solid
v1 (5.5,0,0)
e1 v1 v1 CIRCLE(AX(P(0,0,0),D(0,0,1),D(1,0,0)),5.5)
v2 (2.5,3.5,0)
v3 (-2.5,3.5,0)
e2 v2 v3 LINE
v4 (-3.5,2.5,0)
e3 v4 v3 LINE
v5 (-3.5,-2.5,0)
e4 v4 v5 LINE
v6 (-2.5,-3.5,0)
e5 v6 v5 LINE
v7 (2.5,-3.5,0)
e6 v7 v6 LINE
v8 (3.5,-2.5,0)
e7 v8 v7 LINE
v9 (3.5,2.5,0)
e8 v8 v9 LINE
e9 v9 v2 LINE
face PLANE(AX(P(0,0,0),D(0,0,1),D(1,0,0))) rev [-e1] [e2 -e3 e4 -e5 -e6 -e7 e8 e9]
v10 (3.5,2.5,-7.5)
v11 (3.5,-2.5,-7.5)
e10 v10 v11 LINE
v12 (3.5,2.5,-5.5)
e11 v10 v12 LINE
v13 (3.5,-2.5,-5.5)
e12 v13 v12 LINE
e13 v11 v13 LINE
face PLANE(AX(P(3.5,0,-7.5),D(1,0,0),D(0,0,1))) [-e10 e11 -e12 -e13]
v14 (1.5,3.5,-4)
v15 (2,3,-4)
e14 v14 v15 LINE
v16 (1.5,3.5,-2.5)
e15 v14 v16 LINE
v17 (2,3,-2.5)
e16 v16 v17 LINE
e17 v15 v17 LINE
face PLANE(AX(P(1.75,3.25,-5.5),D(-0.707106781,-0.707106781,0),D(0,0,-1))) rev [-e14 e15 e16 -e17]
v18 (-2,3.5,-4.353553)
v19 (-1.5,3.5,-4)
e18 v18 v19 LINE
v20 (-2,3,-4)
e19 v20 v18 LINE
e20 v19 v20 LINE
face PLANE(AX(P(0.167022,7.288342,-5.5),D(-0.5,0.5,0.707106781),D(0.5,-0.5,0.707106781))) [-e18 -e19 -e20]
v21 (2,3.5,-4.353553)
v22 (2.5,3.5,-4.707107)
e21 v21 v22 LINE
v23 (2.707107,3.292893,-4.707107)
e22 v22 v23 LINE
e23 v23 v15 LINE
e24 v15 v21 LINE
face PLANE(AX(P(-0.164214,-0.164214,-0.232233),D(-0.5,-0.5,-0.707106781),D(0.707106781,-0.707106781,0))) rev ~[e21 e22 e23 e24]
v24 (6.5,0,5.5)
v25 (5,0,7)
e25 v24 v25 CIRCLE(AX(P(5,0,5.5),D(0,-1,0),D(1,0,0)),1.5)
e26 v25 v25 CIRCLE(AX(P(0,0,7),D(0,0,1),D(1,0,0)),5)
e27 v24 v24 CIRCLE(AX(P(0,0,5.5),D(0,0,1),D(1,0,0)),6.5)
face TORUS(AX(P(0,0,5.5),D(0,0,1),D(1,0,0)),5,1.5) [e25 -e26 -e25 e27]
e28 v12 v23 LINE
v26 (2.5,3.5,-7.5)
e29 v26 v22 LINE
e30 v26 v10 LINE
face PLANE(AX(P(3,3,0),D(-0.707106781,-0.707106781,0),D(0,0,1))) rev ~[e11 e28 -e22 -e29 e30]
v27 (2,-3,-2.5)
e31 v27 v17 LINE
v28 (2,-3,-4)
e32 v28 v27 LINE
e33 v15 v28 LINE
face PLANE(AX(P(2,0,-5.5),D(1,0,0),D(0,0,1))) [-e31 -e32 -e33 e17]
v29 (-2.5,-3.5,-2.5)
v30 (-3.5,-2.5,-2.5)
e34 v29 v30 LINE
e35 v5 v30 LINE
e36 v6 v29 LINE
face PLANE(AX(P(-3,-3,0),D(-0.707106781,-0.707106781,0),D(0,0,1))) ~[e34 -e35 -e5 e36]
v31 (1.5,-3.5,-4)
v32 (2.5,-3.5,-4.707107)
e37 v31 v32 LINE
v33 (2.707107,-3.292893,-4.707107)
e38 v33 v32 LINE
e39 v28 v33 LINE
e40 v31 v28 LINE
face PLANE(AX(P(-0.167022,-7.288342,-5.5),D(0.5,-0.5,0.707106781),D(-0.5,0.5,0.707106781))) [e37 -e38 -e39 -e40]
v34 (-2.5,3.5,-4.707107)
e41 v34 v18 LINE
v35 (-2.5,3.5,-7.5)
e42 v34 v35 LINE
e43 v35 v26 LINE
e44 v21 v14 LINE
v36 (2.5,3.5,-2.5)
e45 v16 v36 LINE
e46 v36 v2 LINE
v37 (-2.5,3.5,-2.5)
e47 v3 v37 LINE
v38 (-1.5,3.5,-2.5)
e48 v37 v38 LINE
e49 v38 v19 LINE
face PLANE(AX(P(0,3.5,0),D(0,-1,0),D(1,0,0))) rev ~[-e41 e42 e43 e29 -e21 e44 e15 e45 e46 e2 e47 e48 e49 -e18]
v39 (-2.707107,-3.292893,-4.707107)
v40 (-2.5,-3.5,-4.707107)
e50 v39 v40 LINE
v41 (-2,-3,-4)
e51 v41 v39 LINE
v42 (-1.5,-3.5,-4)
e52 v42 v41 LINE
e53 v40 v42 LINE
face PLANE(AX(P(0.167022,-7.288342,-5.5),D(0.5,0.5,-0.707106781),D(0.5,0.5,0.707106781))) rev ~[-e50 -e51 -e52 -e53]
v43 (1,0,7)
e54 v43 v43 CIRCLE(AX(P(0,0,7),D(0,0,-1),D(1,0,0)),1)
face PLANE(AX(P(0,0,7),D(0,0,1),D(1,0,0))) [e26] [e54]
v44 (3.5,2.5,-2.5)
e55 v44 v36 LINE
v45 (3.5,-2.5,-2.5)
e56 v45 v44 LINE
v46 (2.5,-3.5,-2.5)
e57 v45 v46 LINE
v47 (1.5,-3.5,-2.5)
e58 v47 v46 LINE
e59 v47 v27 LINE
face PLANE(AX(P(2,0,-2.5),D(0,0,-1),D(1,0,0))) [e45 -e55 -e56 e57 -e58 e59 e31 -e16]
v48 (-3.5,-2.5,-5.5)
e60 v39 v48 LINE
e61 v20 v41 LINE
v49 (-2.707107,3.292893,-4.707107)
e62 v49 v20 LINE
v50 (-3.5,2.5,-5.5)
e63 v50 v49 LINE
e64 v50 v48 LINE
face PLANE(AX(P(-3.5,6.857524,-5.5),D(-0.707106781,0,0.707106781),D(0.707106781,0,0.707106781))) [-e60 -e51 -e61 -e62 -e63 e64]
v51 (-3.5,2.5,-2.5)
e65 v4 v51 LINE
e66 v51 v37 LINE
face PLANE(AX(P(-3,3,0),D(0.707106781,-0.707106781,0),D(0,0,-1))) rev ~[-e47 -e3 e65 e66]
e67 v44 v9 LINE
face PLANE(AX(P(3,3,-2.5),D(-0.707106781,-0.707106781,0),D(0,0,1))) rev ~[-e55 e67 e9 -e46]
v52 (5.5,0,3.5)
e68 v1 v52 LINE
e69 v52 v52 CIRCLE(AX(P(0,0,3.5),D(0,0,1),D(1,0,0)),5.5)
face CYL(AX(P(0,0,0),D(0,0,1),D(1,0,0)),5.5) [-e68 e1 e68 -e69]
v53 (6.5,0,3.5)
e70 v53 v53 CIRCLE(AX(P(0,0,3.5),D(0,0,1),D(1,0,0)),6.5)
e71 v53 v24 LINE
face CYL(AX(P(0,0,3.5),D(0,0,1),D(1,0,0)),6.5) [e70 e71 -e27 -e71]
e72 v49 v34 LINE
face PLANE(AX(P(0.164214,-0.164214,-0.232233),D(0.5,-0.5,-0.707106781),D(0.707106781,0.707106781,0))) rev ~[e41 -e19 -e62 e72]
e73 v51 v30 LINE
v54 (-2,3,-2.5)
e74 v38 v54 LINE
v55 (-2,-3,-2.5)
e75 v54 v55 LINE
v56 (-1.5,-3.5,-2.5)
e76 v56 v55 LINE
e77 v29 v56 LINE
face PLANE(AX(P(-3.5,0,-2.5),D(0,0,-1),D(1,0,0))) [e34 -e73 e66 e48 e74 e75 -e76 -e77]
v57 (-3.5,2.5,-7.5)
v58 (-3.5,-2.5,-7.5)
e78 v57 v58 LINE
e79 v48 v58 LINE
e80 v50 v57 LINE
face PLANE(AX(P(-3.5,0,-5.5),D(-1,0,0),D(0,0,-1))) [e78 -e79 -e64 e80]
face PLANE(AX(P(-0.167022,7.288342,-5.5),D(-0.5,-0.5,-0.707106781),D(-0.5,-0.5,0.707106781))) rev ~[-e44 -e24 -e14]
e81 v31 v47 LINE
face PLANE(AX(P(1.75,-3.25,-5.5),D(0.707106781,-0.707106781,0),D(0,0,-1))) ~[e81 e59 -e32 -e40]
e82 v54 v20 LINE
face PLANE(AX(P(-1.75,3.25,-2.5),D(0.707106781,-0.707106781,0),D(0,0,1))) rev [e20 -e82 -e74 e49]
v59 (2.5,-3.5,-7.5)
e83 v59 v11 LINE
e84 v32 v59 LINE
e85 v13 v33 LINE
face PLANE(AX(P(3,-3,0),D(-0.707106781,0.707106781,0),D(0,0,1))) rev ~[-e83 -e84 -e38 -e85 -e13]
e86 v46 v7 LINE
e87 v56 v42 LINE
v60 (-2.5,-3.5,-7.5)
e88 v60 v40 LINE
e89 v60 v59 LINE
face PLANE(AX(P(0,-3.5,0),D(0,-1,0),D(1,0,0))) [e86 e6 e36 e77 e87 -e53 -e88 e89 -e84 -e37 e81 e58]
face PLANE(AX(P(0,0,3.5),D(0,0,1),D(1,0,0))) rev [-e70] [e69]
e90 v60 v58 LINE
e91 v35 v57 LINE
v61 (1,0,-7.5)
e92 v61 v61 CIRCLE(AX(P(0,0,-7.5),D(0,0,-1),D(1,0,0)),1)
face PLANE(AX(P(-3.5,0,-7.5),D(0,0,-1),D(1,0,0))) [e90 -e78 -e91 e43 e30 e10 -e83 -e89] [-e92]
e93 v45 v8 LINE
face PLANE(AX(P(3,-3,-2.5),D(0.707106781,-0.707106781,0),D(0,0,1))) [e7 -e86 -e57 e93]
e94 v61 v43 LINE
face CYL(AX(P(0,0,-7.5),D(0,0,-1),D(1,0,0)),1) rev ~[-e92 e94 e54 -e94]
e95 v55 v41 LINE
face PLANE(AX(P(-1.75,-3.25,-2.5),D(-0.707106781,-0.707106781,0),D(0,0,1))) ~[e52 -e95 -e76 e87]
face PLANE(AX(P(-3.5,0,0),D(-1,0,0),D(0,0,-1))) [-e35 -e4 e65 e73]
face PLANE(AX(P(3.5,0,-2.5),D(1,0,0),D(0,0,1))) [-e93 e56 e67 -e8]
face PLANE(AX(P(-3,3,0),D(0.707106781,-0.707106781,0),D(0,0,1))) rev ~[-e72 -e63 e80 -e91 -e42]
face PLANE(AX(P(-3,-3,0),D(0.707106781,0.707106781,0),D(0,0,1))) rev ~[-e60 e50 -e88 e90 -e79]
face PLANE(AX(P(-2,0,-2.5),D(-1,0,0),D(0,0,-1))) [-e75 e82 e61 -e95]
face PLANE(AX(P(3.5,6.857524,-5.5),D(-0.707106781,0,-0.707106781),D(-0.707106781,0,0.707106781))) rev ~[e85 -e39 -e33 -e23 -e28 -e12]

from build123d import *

# Parameters (mm, degrees)
F3_DEPTH     = 3.5
F4_SIZE      = 1
F5_SIZE      = 0.5
F6_T4_DEPTH  = 8.4221557451
F6_T11_DEPTH = 13.7150489639
F6_T21_DEPTH = 8.4221557451
F6_T28_DEPTH = 8.4221557451
F6_T35_DEPTH = 13.7150489639
F6_T45_DEPTH = 8.4221557451
F7_R         = 1.5
F8_R         = 1
F9_DEPTH     = 25


# Not quite as in the source:
# - a fillet or chamfer that OpenCascade refuses, or shapes differently, is made with other operations: its cross-section is extruded or revolved along the edge and cut away or added


with BuildPart() as f1:
    # F0 (on Front) → F1 (revolve)
    with BuildSketch(Plane.XZ):
        Polygon((0, 7), (0, 0), (5.5, 0), (5.5, 3.5), (6.5, 3.5), (6.5, 7), align=None)
    revolve(axis=Axis((0, 0, 5.0261294236), (0, 0, 1)))

    # F2 (on Front) → F3 (join, symmetric)
    with BuildSketch(Plane.XZ):
        Polygon((3.5, 0), (-3.5, 0), (-3.5, -2.5), (-2, -2.5), (-2, -5.5), (-3.5, -5.5), (-3.5, -7.5), (3.5, -7.5), (3.5, -5.5), (2, -5.5), (2, -2.5), (3.5, -2.5), align=None)
    extrude(amount=F3_DEPTH, both=True)

    # F4
    f4_edges = [f1.edges().sort_by_distance(p)[0] for p in [
        (3.5, -3.5, -1.25),
        (3.5, 3.5, -1.25),
        (-3.5, 3.5, -1.25),
        (-3.5, -3.5, -1.25),
        (-3.5, -3.5, -6.5),
        (3.5, -3.5, -6.5),
        (-3.5, 3.5, -6.5),
        (3.5, 3.5, -6.5),
    ]]
    chamfer(f4_edges, length=F4_SIZE)

    # F5
    f5_edges = [f1.edges().sort_by_distance(p)[0] for p in [
        (2, -3.5, -4),
        (-2, -3.5, -4),
        (-2, 3.5, -4),
        (2, 3.5, -4),
    ]]
    chamfer(f5_edges, length=F5_SIZE)

    # F6: chamfer of 1.5 on 6 edges, made by hand


with BuildPart() as f6_tool2:
    # F6_s3 → F6_t4 (new body)
    with BuildSketch(Plane(origin=(3.7276817198, -3.7276817198, 0), x_dir=(0, 0, 1), z_dir=(-0.7071067812, 0.7071067812, 0))):
        Polygon((-5.5, -5.0355339059), (-4, -3.5355339059), (-5.5, -3.5355339059), align=None)
    extrude(amount=F6_T4_DEPTH)

    split(bisect_by=Plane.XZ.offset(3.5), keep=Keep.BOTTOM)

    split(bisect_by=Plane(origin=(-3, -3, 0), x_dir=(0, 0, 1), z_dir=(0.7071067812, 0.7071067812, 0)), keep=Keep.TOP)

    split(bisect_by=Plane(origin=(1, 0, -1), x_dir=(0, 1, 0), z_dir=(0.7071067812, 0, -0.7071067812)), keep=Keep.TOP)


with BuildPart() as f1_1:
    add(f1.part)

    # F6_t1: union F6_tool2
    add(f6_tool2.part)


with BuildPart() as f6_tool9:
    # F6_s10 → F6_t11 (new body)
    with BuildSketch(Plane.XZ.offset(-6.8575244819)):
        Polygon((-3.5, -5.5), (-2, -4), (-2, -5.5), align=None)
    extrude(amount=F6_T11_DEPTH)

    split(bisect_by=Plane.XZ.offset(3.5), keep=Keep.BOTTOM)

    split(bisect_by=Plane(origin=(-3, -3, 0), x_dir=(0, 0, 1), z_dir=(0.7071067812, 0.7071067812, 0)), keep=Keep.TOP)

    split(bisect_by=Plane.XZ.offset(-3.5), keep=Keep.TOP)

    split(bisect_by=Plane(origin=(-3, 3, 0), x_dir=(0, 0, 1), z_dir=(0.7071067812, -0.7071067812, 0)), keep=Keep.TOP)

    split(bisect_by=Plane(origin=(0.1642135624, -0.1642135624, -0.232233047), x_dir=(0.7071067812, 0.7071067812, 0), z_dir=(0.5, -0.5, -0.7071067812)), keep=Keep.TOP)

    split(bisect_by=Plane(origin=(0.1642135624, 0.1642135624, -0.232233047), x_dir=(-0.7071067812, 0.7071067812, 0), z_dir=(0.5, 0.5, -0.7071067812)), keep=Keep.TOP)


with BuildPart() as f1_2:
    add(f1_1.part)

    # F6_t8: union F6_tool9
    add(f6_tool9.part)


with BuildPart() as f6_tool19:
    # F6_s20 → F6_t21 (new body)
    with BuildSketch(Plane(origin=(3.7276817198, 3.7276817198, 0), x_dir=(0, 0, 1), z_dir=(-0.7071067812, -0.7071067812, 0))):
        Polygon((-5.5, 5.0355339059), (-4, 3.5355339059), (-5.5, 3.5355339059), align=None)
    extrude(amount=F6_T21_DEPTH)

    split(bisect_by=Plane.XZ.offset(-3.5), keep=Keep.TOP)

    split(bisect_by=Plane(origin=(-3, 3, 0), x_dir=(0, 0, 1), z_dir=(0.7071067812, -0.7071067812, 0)), keep=Keep.TOP)

    split(bisect_by=Plane(origin=(1, 0, -1), x_dir=(0, 1, 0), z_dir=(0.7071067812, 0, -0.7071067812)), keep=Keep.TOP)


with BuildPart() as f1_3:
    add(f1_2.part)

    # F6_t18: union F6_tool19
    add(f6_tool19.part)


with BuildPart() as f6_tool26:
    # F6_s27 → F6_t28 (new body)
    with BuildSketch(Plane(origin=(-3.7276817198, -3.7276817198, 0), x_dir=(0, 0, 1), z_dir=(0.7071067812, 0.7071067812, 0))):
        Polygon((-5.5, 5.0355339059), (-4, 3.5355339059), (-5.5, 3.5355339059), align=None)
    extrude(amount=F6_T28_DEPTH)

    split(bisect_by=Plane.XZ.offset(3.5), keep=Keep.BOTTOM)

    split(bisect_by=Plane(origin=(3, -3, 0), x_dir=(0, 0, 1), z_dir=(-0.7071067812, 0.7071067812, 0)), keep=Keep.TOP)

    split(bisect_by=Plane(origin=(-1, 0, -1), x_dir=(0, 1, 0), z_dir=(-0.7071067812, 0, -0.7071067812)), keep=Keep.TOP)


with BuildPart() as f1_4:
    add(f1_3.part)

    # F6_t25: union F6_tool26
    add(f6_tool26.part)


with BuildPart() as f6_tool33:
    # F6_s34 → F6_t35 (new body)
    with BuildSketch(Plane.XZ.offset(-6.8575244819)):
        Polygon((3.5, -5.5), (2, -4), (2, -5.5), align=None)
    extrude(amount=F6_T35_DEPTH)

    split(bisect_by=Plane.XZ.offset(3.5), keep=Keep.BOTTOM)

    split(bisect_by=Plane(origin=(3, -3, 0), x_dir=(0, 0, 1), z_dir=(-0.7071067812, 0.7071067812, 0)), keep=Keep.TOP)

    split(bisect_by=Plane.XZ.offset(-3.5), keep=Keep.TOP)

    split(bisect_by=Plane(origin=(3, 3, 0), x_dir=(0, 0, 1), z_dir=(-0.7071067812, -0.7071067812, 0)), keep=Keep.TOP)

    split(bisect_by=Plane(origin=(-0.1642135624, -0.1642135624, -0.232233047), x_dir=(0.7071067812, -0.7071067812, 0), z_dir=(-0.5, -0.5, -0.7071067812)), keep=Keep.TOP)

    split(bisect_by=Plane(origin=(-0.1642135624, 0.1642135624, -0.232233047), x_dir=(-0.7071067812, -0.7071067812, 0), z_dir=(-0.5, 0.5, -0.7071067812)), keep=Keep.TOP)


with BuildPart() as f1_5:
    add(f1_4.part)

    # F6_t32: union F6_tool33
    add(f6_tool33.part)


with BuildPart() as f6_tool43:
    # F6_s44 → F6_t45 (new body)
    with BuildSketch(Plane(origin=(-3.7276817198, 3.7276817198, 0), x_dir=(0, 0, 1), z_dir=(0.7071067812, -0.7071067812, 0))):
        Polygon((-5.5, -5.0355339059), (-4, -3.5355339059), (-5.5, -3.5355339059), align=None)
    extrude(amount=F6_T45_DEPTH)

    split(bisect_by=Plane.XZ.offset(-3.5), keep=Keep.TOP)

    split(bisect_by=Plane(origin=(3, 3, 0), x_dir=(0, 0, 1), z_dir=(-0.7071067812, -0.7071067812, 0)), keep=Keep.TOP)

    split(bisect_by=Plane(origin=(-1, 0, -1), x_dir=(0, 1, 0), z_dir=(-0.7071067812, 0, -0.7071067812)), keep=Keep.TOP)


with BuildPart() as f1_6:
    add(f1_5.part)

    # F6_t42: union F6_tool43
    add(f6_tool43.part)

    # F7
    f7_edges = [f1_6.edges().sort_by_distance(p)[0] for p in [
        (-6.5, 0, 7),
    ]]
    fillet(f7_edges, radius=F7_R)

    # F8 (on face) → F9 (cut)
    with BuildSketch(Plane(origin=(0, 0, -7.5), x_dir=(1, 0, 0), z_dir=(0, 0, -1))):
        Circle(F8_R)
    extrude(amount=-F9_DEPTH, mode=Mode.SUBTRACT)


solid = f1_6.part
